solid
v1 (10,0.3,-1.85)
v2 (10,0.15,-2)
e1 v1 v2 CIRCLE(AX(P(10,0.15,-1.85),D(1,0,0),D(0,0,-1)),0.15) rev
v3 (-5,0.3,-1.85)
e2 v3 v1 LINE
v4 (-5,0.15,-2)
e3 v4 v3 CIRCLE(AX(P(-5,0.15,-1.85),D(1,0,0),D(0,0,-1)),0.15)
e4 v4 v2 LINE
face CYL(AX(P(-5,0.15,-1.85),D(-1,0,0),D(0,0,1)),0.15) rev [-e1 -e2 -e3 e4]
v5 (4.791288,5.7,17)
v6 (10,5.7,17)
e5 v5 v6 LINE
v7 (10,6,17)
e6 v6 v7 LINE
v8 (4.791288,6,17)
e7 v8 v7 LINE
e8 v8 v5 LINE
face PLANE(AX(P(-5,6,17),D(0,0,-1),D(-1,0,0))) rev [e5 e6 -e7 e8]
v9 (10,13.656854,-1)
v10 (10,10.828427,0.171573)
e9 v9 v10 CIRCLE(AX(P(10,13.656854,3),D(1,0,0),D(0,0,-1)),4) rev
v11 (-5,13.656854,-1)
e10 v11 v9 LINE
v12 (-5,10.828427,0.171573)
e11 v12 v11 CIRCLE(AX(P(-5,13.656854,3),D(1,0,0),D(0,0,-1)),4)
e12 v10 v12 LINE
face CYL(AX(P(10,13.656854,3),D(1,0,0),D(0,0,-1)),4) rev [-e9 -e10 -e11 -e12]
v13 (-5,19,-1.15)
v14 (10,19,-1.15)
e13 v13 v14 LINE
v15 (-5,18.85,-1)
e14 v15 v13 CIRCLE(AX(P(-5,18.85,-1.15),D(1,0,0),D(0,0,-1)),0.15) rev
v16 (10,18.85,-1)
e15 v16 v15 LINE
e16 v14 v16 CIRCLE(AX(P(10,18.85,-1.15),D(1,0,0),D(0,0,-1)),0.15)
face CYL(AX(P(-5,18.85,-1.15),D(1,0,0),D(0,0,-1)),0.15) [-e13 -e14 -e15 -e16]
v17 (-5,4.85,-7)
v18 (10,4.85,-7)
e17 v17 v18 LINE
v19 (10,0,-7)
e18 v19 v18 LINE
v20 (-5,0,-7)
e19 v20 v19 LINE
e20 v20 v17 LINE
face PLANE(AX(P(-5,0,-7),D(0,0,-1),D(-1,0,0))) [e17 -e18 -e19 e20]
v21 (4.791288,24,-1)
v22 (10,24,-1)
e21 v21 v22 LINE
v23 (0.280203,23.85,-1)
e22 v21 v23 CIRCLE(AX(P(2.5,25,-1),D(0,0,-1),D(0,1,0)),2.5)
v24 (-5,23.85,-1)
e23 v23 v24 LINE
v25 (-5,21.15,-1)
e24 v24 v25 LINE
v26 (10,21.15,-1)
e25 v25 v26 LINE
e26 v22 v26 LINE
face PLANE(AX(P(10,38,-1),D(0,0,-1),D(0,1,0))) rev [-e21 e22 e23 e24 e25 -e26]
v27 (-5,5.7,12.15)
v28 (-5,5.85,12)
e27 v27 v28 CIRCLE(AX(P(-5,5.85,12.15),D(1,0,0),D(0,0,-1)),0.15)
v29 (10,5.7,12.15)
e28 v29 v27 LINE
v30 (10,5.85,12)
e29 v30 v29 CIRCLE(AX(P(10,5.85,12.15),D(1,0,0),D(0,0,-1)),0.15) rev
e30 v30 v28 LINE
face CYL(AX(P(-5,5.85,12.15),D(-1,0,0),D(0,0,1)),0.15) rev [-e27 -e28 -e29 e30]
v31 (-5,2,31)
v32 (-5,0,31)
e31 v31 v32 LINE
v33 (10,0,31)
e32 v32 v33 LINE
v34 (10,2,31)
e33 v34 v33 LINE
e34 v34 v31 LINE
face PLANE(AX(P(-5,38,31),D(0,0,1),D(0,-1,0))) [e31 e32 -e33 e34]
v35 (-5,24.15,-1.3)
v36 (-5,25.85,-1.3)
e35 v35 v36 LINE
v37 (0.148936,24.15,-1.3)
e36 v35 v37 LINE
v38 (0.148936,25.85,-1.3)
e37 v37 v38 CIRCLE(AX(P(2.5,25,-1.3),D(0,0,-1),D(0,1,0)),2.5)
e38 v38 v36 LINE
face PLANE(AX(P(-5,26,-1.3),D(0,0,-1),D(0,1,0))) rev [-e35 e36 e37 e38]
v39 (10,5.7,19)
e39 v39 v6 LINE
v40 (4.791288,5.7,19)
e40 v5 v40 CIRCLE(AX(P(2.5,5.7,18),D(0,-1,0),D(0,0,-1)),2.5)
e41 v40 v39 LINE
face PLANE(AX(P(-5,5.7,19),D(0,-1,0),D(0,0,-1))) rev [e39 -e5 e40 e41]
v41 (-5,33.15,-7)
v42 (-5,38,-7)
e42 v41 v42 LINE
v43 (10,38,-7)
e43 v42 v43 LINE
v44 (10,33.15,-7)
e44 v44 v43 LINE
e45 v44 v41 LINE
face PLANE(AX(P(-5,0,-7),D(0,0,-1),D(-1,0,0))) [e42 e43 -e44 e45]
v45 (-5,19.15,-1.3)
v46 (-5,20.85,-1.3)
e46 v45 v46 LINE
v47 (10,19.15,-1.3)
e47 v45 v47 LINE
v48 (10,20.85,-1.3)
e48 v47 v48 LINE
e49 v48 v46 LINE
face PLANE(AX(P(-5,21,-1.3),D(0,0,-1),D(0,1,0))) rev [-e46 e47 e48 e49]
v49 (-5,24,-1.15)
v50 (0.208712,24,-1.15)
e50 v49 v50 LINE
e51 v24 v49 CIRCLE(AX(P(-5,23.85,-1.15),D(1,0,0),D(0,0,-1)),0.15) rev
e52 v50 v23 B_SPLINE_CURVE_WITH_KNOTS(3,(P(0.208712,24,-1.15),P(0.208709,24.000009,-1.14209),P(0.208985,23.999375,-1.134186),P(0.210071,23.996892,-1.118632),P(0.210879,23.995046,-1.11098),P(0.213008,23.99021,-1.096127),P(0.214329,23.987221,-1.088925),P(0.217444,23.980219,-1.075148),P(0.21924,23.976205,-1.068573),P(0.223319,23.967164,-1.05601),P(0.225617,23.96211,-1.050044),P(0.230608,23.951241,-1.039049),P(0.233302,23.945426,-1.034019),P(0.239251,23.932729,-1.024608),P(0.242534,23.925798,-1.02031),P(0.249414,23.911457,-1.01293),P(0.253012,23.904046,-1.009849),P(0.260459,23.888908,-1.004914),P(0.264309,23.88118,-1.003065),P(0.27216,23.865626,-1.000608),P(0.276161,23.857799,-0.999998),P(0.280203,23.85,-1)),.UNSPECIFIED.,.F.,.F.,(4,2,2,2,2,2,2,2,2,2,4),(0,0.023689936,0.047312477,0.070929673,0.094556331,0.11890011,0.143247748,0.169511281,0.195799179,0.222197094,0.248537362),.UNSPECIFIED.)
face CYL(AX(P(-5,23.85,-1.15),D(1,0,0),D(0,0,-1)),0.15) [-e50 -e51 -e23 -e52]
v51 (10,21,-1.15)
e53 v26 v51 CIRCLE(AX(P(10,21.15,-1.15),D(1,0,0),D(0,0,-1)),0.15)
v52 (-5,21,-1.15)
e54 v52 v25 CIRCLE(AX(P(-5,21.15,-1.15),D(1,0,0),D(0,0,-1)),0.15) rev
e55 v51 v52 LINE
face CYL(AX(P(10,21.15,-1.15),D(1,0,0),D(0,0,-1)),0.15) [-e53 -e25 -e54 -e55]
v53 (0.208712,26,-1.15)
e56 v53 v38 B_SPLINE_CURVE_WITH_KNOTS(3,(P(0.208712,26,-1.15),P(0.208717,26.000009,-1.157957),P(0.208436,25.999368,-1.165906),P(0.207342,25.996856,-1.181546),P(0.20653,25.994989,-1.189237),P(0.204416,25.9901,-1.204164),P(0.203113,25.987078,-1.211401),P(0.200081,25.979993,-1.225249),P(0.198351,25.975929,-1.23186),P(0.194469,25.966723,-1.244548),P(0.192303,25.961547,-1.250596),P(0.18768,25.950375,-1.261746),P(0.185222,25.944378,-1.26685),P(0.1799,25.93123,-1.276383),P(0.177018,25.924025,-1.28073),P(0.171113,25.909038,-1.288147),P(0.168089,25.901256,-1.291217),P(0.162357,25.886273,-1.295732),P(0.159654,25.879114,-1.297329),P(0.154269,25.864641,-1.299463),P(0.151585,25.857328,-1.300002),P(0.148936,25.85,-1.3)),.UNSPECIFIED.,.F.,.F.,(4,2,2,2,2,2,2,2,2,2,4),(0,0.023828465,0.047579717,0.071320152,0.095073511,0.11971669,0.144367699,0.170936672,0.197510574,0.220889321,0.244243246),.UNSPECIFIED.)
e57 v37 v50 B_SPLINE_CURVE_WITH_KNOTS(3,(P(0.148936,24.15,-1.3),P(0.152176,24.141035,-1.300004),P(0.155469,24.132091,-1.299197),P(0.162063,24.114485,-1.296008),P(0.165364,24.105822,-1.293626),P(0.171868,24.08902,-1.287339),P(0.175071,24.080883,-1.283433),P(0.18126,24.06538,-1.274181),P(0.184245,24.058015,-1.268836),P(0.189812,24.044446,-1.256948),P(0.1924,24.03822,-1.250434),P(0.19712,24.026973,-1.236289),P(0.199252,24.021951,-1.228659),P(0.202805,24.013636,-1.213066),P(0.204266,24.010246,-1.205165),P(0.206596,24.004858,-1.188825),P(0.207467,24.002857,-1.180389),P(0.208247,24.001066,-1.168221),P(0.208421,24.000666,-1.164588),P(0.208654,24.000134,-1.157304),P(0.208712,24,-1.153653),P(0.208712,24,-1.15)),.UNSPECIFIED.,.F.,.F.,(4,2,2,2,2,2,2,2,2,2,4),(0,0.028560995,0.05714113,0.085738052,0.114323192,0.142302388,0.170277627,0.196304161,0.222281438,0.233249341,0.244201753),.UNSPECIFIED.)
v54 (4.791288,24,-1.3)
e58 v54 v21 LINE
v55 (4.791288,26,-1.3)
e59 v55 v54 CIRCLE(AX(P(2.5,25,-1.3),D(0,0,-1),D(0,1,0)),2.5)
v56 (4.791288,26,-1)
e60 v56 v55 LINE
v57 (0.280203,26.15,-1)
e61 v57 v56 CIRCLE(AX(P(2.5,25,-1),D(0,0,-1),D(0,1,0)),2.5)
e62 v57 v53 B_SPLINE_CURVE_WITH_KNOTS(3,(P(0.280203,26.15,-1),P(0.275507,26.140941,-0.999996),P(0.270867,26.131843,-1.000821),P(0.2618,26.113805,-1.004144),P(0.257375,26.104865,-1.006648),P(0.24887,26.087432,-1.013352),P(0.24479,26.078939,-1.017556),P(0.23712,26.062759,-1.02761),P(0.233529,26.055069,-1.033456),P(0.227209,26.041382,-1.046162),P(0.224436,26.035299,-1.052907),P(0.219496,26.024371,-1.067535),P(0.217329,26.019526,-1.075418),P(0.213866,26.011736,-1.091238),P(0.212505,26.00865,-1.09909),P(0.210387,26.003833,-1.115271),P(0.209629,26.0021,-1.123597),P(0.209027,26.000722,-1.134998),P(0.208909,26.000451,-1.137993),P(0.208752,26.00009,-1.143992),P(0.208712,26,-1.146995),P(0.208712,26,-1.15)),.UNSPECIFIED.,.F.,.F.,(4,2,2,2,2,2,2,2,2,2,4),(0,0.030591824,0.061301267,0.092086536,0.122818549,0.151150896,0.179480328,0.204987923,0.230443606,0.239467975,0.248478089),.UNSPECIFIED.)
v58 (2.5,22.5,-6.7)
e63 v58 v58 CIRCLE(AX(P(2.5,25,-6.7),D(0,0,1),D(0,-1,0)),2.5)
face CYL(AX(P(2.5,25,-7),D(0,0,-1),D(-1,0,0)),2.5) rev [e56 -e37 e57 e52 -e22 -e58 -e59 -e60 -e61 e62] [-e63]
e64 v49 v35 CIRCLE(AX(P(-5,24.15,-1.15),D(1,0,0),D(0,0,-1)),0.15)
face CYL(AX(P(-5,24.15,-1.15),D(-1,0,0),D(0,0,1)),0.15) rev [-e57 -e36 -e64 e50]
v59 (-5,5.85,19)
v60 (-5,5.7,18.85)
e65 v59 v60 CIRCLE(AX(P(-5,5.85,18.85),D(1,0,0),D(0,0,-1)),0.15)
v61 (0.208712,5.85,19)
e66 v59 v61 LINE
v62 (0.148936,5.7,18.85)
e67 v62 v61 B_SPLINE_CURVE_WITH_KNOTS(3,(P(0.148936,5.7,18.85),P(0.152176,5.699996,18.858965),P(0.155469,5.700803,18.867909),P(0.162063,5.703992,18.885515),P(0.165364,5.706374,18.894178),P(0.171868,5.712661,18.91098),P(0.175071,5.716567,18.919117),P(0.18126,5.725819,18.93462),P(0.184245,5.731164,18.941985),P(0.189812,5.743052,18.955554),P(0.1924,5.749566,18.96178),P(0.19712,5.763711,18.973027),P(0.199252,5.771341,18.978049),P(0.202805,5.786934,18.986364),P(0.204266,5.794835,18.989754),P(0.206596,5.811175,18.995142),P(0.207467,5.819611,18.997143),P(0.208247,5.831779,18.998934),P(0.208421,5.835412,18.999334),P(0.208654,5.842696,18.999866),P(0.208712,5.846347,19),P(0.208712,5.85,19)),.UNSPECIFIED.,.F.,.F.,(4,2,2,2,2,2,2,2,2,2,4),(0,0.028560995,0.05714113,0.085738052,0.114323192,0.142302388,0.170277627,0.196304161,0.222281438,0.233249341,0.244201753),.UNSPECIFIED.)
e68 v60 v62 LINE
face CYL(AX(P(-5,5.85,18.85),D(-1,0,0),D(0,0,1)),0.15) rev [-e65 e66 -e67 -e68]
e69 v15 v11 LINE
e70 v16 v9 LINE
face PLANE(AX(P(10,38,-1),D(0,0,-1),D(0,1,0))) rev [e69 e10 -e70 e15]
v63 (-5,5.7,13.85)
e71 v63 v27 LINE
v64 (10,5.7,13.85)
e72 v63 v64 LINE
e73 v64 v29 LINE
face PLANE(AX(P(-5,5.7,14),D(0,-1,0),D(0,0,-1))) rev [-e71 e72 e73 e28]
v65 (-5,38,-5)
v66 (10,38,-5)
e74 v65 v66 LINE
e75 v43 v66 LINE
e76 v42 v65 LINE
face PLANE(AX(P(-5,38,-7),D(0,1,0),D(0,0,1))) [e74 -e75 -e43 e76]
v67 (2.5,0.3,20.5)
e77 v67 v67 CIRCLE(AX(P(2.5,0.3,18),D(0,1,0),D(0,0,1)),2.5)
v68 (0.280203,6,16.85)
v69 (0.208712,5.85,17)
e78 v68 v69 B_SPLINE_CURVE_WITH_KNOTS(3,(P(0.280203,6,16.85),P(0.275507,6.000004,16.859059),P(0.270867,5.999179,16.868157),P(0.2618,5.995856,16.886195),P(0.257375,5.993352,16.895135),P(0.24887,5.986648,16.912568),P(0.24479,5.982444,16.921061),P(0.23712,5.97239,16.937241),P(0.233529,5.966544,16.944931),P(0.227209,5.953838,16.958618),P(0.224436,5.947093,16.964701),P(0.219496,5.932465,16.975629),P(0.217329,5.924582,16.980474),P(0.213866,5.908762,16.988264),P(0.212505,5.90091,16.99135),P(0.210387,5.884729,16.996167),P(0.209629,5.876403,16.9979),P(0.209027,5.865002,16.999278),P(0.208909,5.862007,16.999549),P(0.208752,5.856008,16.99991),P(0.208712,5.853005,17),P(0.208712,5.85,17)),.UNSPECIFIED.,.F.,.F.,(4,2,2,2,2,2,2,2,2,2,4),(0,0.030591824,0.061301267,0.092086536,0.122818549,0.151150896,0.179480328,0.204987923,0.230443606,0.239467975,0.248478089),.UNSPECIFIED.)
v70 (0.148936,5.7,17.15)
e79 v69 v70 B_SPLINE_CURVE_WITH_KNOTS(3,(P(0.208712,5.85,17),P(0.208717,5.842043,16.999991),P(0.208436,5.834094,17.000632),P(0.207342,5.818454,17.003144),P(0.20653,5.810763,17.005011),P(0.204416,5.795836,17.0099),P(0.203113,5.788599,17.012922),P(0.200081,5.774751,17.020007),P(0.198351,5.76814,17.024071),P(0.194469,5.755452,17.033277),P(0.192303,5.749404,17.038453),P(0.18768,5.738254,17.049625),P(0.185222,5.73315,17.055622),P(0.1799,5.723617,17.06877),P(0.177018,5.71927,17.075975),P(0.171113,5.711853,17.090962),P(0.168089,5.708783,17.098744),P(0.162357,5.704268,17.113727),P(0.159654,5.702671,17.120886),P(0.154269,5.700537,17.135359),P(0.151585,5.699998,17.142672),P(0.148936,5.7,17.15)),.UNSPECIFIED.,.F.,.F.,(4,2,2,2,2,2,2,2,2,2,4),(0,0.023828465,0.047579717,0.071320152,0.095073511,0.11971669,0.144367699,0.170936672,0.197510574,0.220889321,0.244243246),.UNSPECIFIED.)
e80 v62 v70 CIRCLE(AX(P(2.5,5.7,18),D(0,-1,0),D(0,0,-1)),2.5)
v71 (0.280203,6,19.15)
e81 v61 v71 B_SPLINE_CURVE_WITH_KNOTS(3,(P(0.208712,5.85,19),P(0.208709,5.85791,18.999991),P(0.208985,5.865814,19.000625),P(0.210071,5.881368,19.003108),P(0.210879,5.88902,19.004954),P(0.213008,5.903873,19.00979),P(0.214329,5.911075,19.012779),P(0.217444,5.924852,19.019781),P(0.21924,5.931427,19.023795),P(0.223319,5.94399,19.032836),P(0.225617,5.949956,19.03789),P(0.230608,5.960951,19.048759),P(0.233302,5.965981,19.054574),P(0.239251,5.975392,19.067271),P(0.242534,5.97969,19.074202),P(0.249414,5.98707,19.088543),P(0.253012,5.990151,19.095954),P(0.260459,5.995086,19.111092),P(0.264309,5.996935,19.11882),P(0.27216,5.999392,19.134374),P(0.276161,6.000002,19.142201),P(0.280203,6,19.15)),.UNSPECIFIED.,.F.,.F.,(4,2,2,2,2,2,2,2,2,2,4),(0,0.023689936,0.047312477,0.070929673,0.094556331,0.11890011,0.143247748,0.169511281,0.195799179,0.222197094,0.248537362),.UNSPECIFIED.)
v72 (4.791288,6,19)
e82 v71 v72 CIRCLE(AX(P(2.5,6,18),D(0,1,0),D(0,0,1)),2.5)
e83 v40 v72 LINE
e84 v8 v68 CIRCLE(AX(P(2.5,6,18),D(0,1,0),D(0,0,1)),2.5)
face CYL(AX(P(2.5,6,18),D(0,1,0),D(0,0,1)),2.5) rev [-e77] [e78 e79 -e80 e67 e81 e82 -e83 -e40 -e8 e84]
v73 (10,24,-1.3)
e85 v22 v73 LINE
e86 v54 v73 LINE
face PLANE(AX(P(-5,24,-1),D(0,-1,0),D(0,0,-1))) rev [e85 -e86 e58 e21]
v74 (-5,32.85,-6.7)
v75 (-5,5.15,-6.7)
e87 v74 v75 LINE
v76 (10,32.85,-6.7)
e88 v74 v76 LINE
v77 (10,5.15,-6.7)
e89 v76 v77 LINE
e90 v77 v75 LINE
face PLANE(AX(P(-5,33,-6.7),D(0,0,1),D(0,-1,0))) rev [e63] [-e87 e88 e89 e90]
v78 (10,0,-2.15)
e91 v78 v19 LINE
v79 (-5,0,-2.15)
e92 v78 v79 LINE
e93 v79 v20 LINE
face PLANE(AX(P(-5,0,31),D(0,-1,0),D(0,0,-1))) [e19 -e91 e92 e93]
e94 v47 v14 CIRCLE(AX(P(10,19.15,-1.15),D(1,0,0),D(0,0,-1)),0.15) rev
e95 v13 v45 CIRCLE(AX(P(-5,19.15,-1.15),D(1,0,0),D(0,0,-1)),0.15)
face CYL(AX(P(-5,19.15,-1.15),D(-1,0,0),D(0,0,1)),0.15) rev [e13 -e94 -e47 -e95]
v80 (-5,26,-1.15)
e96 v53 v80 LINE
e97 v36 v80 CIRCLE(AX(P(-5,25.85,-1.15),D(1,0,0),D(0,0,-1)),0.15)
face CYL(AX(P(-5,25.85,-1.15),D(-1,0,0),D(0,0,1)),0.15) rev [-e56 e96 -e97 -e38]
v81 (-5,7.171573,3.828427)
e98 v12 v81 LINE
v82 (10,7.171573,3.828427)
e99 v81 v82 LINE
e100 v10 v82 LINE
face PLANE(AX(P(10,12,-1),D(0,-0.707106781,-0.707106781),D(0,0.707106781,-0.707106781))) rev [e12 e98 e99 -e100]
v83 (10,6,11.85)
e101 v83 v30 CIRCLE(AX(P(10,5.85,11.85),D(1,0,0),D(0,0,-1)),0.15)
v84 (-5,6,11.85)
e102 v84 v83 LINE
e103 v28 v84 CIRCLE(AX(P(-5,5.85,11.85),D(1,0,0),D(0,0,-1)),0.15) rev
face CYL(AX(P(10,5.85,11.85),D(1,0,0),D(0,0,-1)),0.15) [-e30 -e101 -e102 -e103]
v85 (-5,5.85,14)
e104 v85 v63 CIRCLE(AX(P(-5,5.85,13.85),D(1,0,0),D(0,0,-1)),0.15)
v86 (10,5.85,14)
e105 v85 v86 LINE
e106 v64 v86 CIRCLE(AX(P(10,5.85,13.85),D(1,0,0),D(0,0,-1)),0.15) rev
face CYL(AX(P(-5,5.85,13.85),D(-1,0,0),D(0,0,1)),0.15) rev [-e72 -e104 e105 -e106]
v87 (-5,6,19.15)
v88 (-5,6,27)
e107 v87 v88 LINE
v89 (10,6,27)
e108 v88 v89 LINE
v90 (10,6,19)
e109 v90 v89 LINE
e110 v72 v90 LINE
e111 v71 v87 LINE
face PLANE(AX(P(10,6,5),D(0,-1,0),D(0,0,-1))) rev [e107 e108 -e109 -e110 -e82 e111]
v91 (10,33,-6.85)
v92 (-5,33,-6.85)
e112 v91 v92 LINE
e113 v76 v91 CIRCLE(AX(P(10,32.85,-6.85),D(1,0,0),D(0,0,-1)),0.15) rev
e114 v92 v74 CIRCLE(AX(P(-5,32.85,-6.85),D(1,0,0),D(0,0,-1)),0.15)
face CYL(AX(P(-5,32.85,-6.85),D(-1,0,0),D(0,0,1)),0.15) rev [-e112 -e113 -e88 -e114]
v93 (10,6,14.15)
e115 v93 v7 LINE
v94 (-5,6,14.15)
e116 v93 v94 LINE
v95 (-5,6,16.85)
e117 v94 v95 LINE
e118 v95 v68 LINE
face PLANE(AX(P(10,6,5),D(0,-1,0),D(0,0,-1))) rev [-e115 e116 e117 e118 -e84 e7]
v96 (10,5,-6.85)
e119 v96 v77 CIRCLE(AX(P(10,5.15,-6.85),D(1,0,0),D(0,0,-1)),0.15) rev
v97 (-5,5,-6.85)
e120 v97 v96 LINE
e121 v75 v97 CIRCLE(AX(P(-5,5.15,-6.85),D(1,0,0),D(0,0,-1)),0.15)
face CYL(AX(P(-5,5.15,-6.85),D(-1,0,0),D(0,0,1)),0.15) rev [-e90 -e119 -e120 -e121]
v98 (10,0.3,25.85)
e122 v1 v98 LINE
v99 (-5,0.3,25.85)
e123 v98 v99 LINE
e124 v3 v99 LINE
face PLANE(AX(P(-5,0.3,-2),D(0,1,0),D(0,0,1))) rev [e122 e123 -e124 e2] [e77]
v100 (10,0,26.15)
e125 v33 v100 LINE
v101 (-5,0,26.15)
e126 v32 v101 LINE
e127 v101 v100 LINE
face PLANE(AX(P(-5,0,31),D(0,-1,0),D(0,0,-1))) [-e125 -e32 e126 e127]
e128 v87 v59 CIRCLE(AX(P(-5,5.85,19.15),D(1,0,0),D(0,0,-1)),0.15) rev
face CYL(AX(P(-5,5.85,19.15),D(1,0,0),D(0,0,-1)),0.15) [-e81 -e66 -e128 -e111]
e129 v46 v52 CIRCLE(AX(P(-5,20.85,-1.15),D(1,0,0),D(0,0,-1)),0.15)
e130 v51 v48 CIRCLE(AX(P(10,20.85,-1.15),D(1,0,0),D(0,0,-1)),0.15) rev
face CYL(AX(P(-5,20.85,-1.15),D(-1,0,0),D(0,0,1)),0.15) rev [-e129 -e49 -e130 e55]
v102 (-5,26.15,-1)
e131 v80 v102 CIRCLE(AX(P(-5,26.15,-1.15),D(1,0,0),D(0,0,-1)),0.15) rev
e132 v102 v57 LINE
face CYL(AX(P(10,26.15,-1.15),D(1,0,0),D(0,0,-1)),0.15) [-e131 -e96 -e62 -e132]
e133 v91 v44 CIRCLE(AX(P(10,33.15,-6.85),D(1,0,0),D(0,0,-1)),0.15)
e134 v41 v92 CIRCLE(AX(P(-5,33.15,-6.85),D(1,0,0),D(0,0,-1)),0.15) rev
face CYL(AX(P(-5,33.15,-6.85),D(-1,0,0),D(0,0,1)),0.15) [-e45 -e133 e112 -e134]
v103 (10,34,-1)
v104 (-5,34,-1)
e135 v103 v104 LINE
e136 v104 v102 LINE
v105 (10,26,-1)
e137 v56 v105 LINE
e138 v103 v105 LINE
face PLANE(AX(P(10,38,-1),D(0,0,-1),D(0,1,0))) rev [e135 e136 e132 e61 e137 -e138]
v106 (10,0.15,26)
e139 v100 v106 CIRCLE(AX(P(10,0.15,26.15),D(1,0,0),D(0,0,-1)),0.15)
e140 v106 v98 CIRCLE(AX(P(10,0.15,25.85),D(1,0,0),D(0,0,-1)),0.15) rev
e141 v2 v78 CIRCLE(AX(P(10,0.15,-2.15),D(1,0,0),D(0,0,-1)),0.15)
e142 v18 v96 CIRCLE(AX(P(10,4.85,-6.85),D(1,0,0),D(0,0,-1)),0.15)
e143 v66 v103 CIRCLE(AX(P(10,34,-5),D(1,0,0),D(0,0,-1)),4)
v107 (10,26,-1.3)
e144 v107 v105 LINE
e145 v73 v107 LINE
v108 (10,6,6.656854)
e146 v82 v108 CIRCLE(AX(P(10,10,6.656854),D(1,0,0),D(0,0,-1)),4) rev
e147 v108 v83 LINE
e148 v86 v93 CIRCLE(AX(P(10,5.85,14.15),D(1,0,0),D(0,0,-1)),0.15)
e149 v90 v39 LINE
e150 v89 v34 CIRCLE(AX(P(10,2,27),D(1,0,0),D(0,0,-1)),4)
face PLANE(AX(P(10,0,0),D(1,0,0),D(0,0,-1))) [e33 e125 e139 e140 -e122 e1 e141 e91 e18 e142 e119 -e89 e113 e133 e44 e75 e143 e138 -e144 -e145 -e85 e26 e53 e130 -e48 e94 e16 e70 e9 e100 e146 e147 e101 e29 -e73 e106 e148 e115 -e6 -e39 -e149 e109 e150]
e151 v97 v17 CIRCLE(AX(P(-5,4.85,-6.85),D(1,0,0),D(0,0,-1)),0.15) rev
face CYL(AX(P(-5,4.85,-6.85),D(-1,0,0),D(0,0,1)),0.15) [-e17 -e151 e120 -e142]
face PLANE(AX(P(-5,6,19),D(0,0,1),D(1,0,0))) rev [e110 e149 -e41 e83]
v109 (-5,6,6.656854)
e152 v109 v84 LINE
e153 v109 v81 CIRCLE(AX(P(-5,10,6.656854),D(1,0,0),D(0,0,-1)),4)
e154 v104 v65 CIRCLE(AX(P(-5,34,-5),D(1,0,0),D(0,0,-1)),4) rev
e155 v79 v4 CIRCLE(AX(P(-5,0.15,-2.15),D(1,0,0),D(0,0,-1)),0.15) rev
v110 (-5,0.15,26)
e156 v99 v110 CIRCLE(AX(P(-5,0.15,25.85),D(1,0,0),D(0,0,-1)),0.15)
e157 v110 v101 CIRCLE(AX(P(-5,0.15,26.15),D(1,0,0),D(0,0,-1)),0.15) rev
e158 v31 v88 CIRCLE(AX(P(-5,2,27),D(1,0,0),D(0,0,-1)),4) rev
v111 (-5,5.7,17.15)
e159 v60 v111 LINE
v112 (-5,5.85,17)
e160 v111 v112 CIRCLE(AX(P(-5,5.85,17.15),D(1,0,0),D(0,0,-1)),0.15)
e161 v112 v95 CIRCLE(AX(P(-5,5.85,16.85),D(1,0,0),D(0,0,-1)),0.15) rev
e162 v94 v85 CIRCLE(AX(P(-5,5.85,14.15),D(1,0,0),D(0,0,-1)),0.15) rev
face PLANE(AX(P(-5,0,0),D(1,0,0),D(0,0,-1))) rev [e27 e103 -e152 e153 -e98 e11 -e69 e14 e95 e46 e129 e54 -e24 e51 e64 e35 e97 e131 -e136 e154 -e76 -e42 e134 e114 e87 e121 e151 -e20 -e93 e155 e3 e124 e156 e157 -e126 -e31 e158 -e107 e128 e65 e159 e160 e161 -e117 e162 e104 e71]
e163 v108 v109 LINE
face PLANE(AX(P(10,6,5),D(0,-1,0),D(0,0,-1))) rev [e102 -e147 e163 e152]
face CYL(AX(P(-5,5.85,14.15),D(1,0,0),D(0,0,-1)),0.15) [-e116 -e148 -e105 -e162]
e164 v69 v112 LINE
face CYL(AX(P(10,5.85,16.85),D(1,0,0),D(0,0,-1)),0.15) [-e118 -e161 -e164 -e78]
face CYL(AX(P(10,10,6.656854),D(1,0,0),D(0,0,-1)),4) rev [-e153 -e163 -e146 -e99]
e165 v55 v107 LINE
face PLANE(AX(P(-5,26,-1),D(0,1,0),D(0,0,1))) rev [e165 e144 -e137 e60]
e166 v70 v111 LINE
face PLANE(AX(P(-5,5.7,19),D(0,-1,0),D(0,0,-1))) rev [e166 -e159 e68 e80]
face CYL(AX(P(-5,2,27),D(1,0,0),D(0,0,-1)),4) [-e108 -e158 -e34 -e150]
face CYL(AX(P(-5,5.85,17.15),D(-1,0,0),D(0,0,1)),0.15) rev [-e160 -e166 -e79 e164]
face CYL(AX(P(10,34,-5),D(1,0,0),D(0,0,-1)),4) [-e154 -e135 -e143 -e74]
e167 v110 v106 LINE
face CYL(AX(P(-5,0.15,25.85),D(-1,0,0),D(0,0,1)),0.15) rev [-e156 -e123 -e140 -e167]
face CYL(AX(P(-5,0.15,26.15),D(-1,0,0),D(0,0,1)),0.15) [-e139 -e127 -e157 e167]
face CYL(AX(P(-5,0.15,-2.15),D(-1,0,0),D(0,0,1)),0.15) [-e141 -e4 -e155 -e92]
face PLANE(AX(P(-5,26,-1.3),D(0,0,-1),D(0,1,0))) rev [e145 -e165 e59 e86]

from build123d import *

# Parameters (mm, degrees)
ESBO_O1_W                  = 38
ESBO_O1_H                  = 38
RESSALTO_EXTRUS_O1_DEPTH   = 15
CORTE_EXTRUS_O1_DEPTH      = 52.28352562
ESBO_O7_W                  = 0.3
ESBO_O7_H                  = 28
ESBO_O7_W_2                = 28
ESBO_O7_H_2                = 0.3
ESBO_O7_W_3                = 2
ESBO_O7_H_3                = 2
CORTE_EXTRUS_O2_DEPTH      = 52.28352562
FURO_DE_DI_METRO_7_0_7_3_D = 5
FURO_DE_DI_METRO_7_0_7_2_D = 5
FILETE1_R                  = 4
FILETE2_R                  = 0.15


with BuildPart() as part:
    # Esboço1 → Ressalto-extrusão1 (new body)
    with BuildSketch(Plane(origin=(10, 0, 0), x_dir=(0, 0, -1), z_dir=(1, 0, 0))):
        with Locations((-12, 19)):
            Rectangle(ESBO_O1_W, ESBO_O1_H)
    extrude(amount=-RESSALTO_EXTRUS_O1_DEPTH)

    # Esboço2 → Corte-extrusão1 (cut, through all)
    with BuildSketch(Plane.ZY.offset(5)):
        Polygon((31, 38), (-1, 38), (-1, 12), (5, 6), (31, 6), align=None)
    extrude(amount=-CORTE_EXTRUS_O1_DEPTH, mode=Mode.SUBTRACT)

    # Esboço7 → Corte-extrusão2 (cut, through all)
    with BuildSketch(Plane(origin=(10, 0, 0), x_dir=(0, 0, -1), z_dir=(1, 0, 0))):
        with Locations((6.85, 19)):
            Rectangle(ESBO_O7_W, ESBO_O7_H)
        with Locations((-12, 0.15)):
            Rectangle(ESBO_O7_W_2, ESBO_O7_H_2)
        with Locations((-13, 5.85)):
            Rectangle(ESBO_O7_W_3, ESBO_O7_H_2)
        with Locations((1.15, 20)):
            Rectangle(ESBO_O7_W, ESBO_O7_H_3)
        with Locations((-18, 5.85)):
            Rectangle(ESBO_O7_W_3, ESBO_O7_H_2)
        with Locations((1.15, 25)):
            Rectangle(ESBO_O7_W, ESBO_O7_H_3)
    extrude(amount=-CORTE_EXTRUS_O2_DEPTH, mode=Mode.SUBTRACT)

    # Furo de diâmetro Ø7.0 (7)3 (through all)
    with Locations(Plane(origin=(0, 6, 0), x_dir=(1, 0, 0), z_dir=(0, 1, 0))):
        with Locations((2.5, -18)):
            Hole(FURO_DE_DI_METRO_7_0_7_3_D / 2)

    # Furo de diâmetro Ø7.0 (7)2 (through all)
    with Locations(Plane(origin=(0, 0, -7), x_dir=(-1, 0, 0), z_dir=(0, 0, -1))):
        with Locations((-2.5, 25)):
            Hole(FURO_DE_DI_METRO_7_0_7_2_D / 2)

    # Filete1
    filete1_edges = [part.edges().sort_by_distance(p)[0] for p in [
        (2.5, 6, 31),
        (2.5, 6, 5),
        (2.5, 12, -1),
        (2.5, 38, -1),
    ]]
    fillet(filete1_edges, radius=FILETE1_R)

    # Filete2
    filete2_edges = [part.edges().sort_by_distance(p)[0] for p in [
        (2.5, 5, -7),
        (2.5, 5, -6.7),
        (2.5, 33, -7),
        (2.5, 33, -6.7),
        (2.5, 0, 26),
        (2.5, 0.3, 26),
        (2.5, 0.3, -2),
        (2.5, 0, -2),
        (2.5, 19, -1.3),
        (2.5, 19, -1),
        (2.5, 21, -1.3),
        (2.5, 21, -1),
        (2.5, 5.7, 14),
        (2.5, 6, 14),
        (2.5, 5.7, 12),
        (2.5, 6, 12),
        (-2.395643924, 26, -1.3),
        (-2.395643924, 24, -1.3),
        (-2.395643924, 24, -1),
        (-2.395643924, 26, -1),
        (-2.395643924, 5.7, 19),
        (-2.395643924, 5.7, 17),
        (-2.395643924, 6, 17),
        (-2.395643924, 6, 19),
    ]]
    fillet(filete2_edges, radius=FILETE2_R - 0.0001)  # a hair under: the kernel refuses the full size


solid = part.part
